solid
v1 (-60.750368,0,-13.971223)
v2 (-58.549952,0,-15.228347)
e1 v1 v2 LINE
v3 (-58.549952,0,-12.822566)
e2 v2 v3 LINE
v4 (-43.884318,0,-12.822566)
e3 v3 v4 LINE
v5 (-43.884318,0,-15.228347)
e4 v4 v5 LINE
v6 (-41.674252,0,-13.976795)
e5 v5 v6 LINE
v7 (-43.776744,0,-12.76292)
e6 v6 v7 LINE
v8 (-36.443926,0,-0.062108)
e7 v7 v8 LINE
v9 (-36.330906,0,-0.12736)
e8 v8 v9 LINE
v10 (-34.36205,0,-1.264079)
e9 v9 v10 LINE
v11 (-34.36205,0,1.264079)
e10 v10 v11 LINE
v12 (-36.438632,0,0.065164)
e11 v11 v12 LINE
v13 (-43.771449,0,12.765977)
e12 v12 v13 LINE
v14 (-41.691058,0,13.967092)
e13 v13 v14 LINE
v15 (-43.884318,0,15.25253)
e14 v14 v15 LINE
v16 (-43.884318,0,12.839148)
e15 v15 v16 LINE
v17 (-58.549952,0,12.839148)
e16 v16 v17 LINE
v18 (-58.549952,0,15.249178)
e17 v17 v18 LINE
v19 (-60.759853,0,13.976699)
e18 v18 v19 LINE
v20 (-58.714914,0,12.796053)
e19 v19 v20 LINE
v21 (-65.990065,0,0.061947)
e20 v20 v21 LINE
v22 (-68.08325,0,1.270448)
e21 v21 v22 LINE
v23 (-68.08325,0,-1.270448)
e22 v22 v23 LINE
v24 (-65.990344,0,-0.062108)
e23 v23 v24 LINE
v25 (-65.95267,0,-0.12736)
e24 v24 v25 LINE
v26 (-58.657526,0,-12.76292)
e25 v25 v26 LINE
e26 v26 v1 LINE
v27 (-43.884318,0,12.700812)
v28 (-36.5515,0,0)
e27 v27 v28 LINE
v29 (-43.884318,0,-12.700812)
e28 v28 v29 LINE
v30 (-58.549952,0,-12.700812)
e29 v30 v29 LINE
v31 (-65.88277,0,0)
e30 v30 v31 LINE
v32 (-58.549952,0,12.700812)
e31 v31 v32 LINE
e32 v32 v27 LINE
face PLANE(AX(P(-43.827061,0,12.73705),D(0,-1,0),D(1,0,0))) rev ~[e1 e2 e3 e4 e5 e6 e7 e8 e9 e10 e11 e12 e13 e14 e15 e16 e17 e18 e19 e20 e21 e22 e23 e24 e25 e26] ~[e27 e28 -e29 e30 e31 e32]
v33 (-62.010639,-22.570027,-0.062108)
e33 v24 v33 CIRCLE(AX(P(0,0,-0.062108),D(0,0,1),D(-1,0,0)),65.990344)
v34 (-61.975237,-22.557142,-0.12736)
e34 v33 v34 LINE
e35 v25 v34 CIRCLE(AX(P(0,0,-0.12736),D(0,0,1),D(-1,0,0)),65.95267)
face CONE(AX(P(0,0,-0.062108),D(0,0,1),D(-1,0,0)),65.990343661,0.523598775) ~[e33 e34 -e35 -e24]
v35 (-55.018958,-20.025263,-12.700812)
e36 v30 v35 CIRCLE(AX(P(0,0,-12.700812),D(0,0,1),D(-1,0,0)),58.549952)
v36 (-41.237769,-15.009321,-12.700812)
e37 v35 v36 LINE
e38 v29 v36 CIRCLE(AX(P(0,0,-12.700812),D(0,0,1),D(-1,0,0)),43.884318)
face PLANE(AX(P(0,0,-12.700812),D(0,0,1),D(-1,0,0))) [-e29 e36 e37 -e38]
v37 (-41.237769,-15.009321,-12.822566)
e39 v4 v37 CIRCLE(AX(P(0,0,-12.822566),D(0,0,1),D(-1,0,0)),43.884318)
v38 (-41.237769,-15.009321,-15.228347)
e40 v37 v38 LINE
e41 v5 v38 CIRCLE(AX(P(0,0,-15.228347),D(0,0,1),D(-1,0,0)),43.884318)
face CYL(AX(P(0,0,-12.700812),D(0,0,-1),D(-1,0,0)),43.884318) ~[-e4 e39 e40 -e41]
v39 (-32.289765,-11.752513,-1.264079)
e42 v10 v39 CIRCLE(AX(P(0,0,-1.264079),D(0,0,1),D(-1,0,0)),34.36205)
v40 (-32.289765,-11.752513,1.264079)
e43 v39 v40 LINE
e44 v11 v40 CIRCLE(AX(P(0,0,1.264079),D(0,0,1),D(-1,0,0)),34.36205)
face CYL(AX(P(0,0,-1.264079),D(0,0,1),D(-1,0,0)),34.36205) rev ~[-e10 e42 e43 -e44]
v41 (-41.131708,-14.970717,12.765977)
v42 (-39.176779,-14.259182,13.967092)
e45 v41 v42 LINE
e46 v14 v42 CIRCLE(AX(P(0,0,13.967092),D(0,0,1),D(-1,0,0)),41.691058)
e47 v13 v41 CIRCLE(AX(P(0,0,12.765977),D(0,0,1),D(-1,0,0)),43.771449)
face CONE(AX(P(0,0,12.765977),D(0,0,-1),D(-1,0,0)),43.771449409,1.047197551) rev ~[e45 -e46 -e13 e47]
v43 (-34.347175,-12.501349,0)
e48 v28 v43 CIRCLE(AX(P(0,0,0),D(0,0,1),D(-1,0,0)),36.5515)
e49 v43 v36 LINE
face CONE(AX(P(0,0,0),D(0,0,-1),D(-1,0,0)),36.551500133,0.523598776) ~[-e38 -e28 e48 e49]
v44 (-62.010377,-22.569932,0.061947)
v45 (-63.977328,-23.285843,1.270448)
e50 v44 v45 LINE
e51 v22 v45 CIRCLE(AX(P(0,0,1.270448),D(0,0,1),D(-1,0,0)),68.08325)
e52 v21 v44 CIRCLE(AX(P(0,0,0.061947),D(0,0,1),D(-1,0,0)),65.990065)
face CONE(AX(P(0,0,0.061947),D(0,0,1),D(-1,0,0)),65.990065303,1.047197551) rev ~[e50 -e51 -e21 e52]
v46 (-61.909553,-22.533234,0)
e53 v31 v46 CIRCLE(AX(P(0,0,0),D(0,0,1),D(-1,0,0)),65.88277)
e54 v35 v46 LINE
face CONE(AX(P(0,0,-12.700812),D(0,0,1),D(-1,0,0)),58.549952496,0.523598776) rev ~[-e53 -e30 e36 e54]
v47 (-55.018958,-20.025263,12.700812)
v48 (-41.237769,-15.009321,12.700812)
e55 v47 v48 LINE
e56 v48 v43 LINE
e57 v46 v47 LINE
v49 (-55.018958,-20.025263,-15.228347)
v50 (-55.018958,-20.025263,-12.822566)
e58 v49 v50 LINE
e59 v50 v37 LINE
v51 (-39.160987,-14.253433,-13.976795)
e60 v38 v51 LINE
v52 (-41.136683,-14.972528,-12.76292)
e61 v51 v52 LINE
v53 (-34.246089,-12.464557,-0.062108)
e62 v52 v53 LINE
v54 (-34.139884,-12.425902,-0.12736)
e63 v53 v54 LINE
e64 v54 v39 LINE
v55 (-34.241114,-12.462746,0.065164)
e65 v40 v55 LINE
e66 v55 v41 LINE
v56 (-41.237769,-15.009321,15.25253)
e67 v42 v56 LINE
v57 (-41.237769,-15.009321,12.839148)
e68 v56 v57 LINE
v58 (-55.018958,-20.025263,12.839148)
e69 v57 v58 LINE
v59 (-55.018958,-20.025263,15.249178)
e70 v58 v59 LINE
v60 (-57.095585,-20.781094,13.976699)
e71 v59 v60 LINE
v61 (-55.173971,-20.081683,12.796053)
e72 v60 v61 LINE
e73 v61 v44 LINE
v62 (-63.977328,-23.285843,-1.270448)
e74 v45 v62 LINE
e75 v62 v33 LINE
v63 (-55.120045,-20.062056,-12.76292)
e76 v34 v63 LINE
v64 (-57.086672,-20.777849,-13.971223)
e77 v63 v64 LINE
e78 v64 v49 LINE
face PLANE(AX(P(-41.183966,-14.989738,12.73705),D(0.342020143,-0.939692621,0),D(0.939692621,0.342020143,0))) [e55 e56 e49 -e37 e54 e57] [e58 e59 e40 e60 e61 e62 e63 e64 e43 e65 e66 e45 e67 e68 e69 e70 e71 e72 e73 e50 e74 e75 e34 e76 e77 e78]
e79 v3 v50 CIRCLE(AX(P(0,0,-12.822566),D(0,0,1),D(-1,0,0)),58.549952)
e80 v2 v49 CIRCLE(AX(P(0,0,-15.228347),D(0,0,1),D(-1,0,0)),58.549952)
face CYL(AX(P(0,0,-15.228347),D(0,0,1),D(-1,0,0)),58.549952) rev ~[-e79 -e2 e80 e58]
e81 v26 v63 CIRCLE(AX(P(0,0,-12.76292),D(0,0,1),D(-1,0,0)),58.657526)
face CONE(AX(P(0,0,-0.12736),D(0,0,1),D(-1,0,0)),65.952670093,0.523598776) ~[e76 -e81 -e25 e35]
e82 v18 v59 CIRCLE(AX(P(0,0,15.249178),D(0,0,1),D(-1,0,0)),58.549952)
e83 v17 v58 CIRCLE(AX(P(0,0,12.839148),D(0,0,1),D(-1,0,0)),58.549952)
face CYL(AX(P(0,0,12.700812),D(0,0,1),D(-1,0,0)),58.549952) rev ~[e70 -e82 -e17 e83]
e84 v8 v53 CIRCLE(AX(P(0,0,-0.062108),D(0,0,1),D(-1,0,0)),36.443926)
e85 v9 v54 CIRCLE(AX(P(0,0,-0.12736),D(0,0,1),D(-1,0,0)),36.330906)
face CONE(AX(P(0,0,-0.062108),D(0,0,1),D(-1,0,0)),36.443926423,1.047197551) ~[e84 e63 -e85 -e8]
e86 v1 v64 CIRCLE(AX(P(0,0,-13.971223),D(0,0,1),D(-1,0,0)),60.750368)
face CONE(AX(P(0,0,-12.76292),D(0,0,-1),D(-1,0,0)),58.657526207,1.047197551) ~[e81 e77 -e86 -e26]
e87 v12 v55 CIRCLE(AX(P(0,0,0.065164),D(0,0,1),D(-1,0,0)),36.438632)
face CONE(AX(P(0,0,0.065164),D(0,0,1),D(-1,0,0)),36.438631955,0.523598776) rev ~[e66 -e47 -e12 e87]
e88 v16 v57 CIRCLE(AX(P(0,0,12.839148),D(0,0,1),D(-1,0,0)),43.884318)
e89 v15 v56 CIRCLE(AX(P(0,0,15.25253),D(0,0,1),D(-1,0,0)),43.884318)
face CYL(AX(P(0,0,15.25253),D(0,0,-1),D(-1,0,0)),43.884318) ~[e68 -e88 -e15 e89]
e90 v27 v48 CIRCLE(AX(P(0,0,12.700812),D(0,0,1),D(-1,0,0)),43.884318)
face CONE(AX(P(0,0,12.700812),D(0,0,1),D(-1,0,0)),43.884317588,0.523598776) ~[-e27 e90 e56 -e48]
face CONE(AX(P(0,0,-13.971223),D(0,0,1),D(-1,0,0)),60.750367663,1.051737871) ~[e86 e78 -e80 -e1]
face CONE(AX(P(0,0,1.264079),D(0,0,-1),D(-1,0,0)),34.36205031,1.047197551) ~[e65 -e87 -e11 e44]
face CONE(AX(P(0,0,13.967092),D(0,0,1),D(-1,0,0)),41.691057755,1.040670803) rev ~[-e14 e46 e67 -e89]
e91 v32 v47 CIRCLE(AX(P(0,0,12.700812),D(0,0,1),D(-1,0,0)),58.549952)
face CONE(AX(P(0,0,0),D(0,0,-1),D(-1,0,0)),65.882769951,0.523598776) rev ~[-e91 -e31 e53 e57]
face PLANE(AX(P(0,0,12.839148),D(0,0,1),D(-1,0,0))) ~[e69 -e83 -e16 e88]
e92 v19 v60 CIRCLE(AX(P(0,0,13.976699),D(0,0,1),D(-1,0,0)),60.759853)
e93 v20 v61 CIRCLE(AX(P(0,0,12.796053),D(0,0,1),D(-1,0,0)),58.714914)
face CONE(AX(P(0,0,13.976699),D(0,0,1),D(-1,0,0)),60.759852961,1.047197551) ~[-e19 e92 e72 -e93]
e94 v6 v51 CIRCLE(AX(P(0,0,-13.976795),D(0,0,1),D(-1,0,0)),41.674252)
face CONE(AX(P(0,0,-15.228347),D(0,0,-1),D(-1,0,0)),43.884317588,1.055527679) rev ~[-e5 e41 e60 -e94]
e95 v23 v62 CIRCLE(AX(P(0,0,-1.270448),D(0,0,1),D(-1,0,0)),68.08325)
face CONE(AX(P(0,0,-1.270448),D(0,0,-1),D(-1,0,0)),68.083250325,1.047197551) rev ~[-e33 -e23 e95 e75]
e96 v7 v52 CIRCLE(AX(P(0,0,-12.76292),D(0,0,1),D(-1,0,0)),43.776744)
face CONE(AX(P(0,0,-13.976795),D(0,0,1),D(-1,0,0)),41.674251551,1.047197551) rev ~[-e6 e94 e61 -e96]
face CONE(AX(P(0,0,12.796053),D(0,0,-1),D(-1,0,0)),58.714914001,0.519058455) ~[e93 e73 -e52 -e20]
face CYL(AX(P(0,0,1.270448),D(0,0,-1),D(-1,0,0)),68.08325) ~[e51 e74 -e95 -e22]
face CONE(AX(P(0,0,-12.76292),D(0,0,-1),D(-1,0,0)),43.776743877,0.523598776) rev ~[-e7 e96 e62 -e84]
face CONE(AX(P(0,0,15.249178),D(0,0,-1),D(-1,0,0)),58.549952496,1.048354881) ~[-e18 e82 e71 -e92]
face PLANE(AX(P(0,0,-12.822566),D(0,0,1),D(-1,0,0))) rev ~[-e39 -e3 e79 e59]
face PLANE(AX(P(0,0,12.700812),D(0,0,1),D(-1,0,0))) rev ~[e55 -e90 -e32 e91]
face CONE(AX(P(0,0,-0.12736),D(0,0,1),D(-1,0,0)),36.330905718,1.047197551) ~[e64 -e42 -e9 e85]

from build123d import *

# Parameters (mm, degrees)
F1_W     = 14.6656349089
F1_H     = 0.1217532289
F2_ANGLE = 20


with BuildPart() as f2:
    # F1 (on Front) → F2 (revolve)
    with BuildSketch(Plane.XZ):
        Polygon((-43.7767438772, 12.7751471548), (-43.8843175875, 12.7008123937), (-43.7714494091, 12.7659768669), align=None)
        Polygon((-36.4386319546, 0.0651644732), (-36.5515001331, 0), (-36.4439264228, -0.0621077106), (-36.3309057177, -0.1273602451), (-34.3620503103, -1.2640794445), (-34.3620503103, 1.2640794445), align=None)
        Polygon((-58.7149140006, 12.7960529626), (-58.5499524964, 12.7008123937), (-58.5499524964, 12.8391478211), (-58.5499524964, 15.2491778135), (-60.7598529608, 13.9766990217), align=None)
        Polygon((-43.7767438772, -12.7629201043), (-43.8843175875, -12.7008123937), (-43.8843175875, -12.8225656226), (-43.8843175875, -15.2283469215), (-41.6742515512, -13.9767946147), align=None)
        Polygon((-58.5499524964, -12.8225656226), (-58.5499524964, -12.7008123937), (-58.6575262067, -12.7629201043), (-60.7503676631, -13.9712226825), (-58.5499524964, -15.2283469215), align=None)
        Polygon((-65.9903436611, -0.0621077106), (-65.8827699508, 0), (-65.9900653034, 0.0619470007), (-68.0832503253, 1.2704479365), (-68.0832503253, -1.2704479365), align=None)
        Polygon((-43.8843175875, 12.7008123937), (-36.5515001331, 0), (-36.4386319546, 0.0651644732), (-43.7714494091, 12.7659768669), align=None)
        Polygon((-36.5515001331, 0), (-43.8843175875, -12.7008123937), (-43.7767438772, -12.7629201043), (-36.4439264228, -0.0621077106), align=None)
        Polygon((-58.5499524964, 12.8391478211), (-58.5499524964, 12.7008123937), (-51.217135042, 12.7008123937), (-43.8843175875, 12.7008123937), (-43.8843175875, 12.8391478211), align=None)
        Polygon((-43.8843175875, 15.2525296435), (-43.8843175875, 12.8391478211), (-43.8843175875, 12.7008123937), (-43.7767438772, 12.7751471548), (-43.7714494091, 12.7659768669), (-41.6910577545, 13.9670915487), align=None)
        Polygon((-65.9900653034, 0.0619470007), (-65.8827699508, 0), (-58.5499524964, 12.7008123937), (-58.7149140006, 12.7960529626), align=None)
        with Locations((-51.217135042, -12.7616890082)):
            Rectangle(F1_W, F1_H)
        Polygon((-58.5499524964, -12.7008123937), (-65.8827699508, 0), (-65.9903436611, -0.0621077106), (-65.9526700928, -0.1273602451), (-58.6575262067, -12.7629201043), align=None)
    revolve(axis=Axis((0, 0, 0), (0, 0, 1)), revolution_arc=F2_ANGLE)


solid = f2.part
